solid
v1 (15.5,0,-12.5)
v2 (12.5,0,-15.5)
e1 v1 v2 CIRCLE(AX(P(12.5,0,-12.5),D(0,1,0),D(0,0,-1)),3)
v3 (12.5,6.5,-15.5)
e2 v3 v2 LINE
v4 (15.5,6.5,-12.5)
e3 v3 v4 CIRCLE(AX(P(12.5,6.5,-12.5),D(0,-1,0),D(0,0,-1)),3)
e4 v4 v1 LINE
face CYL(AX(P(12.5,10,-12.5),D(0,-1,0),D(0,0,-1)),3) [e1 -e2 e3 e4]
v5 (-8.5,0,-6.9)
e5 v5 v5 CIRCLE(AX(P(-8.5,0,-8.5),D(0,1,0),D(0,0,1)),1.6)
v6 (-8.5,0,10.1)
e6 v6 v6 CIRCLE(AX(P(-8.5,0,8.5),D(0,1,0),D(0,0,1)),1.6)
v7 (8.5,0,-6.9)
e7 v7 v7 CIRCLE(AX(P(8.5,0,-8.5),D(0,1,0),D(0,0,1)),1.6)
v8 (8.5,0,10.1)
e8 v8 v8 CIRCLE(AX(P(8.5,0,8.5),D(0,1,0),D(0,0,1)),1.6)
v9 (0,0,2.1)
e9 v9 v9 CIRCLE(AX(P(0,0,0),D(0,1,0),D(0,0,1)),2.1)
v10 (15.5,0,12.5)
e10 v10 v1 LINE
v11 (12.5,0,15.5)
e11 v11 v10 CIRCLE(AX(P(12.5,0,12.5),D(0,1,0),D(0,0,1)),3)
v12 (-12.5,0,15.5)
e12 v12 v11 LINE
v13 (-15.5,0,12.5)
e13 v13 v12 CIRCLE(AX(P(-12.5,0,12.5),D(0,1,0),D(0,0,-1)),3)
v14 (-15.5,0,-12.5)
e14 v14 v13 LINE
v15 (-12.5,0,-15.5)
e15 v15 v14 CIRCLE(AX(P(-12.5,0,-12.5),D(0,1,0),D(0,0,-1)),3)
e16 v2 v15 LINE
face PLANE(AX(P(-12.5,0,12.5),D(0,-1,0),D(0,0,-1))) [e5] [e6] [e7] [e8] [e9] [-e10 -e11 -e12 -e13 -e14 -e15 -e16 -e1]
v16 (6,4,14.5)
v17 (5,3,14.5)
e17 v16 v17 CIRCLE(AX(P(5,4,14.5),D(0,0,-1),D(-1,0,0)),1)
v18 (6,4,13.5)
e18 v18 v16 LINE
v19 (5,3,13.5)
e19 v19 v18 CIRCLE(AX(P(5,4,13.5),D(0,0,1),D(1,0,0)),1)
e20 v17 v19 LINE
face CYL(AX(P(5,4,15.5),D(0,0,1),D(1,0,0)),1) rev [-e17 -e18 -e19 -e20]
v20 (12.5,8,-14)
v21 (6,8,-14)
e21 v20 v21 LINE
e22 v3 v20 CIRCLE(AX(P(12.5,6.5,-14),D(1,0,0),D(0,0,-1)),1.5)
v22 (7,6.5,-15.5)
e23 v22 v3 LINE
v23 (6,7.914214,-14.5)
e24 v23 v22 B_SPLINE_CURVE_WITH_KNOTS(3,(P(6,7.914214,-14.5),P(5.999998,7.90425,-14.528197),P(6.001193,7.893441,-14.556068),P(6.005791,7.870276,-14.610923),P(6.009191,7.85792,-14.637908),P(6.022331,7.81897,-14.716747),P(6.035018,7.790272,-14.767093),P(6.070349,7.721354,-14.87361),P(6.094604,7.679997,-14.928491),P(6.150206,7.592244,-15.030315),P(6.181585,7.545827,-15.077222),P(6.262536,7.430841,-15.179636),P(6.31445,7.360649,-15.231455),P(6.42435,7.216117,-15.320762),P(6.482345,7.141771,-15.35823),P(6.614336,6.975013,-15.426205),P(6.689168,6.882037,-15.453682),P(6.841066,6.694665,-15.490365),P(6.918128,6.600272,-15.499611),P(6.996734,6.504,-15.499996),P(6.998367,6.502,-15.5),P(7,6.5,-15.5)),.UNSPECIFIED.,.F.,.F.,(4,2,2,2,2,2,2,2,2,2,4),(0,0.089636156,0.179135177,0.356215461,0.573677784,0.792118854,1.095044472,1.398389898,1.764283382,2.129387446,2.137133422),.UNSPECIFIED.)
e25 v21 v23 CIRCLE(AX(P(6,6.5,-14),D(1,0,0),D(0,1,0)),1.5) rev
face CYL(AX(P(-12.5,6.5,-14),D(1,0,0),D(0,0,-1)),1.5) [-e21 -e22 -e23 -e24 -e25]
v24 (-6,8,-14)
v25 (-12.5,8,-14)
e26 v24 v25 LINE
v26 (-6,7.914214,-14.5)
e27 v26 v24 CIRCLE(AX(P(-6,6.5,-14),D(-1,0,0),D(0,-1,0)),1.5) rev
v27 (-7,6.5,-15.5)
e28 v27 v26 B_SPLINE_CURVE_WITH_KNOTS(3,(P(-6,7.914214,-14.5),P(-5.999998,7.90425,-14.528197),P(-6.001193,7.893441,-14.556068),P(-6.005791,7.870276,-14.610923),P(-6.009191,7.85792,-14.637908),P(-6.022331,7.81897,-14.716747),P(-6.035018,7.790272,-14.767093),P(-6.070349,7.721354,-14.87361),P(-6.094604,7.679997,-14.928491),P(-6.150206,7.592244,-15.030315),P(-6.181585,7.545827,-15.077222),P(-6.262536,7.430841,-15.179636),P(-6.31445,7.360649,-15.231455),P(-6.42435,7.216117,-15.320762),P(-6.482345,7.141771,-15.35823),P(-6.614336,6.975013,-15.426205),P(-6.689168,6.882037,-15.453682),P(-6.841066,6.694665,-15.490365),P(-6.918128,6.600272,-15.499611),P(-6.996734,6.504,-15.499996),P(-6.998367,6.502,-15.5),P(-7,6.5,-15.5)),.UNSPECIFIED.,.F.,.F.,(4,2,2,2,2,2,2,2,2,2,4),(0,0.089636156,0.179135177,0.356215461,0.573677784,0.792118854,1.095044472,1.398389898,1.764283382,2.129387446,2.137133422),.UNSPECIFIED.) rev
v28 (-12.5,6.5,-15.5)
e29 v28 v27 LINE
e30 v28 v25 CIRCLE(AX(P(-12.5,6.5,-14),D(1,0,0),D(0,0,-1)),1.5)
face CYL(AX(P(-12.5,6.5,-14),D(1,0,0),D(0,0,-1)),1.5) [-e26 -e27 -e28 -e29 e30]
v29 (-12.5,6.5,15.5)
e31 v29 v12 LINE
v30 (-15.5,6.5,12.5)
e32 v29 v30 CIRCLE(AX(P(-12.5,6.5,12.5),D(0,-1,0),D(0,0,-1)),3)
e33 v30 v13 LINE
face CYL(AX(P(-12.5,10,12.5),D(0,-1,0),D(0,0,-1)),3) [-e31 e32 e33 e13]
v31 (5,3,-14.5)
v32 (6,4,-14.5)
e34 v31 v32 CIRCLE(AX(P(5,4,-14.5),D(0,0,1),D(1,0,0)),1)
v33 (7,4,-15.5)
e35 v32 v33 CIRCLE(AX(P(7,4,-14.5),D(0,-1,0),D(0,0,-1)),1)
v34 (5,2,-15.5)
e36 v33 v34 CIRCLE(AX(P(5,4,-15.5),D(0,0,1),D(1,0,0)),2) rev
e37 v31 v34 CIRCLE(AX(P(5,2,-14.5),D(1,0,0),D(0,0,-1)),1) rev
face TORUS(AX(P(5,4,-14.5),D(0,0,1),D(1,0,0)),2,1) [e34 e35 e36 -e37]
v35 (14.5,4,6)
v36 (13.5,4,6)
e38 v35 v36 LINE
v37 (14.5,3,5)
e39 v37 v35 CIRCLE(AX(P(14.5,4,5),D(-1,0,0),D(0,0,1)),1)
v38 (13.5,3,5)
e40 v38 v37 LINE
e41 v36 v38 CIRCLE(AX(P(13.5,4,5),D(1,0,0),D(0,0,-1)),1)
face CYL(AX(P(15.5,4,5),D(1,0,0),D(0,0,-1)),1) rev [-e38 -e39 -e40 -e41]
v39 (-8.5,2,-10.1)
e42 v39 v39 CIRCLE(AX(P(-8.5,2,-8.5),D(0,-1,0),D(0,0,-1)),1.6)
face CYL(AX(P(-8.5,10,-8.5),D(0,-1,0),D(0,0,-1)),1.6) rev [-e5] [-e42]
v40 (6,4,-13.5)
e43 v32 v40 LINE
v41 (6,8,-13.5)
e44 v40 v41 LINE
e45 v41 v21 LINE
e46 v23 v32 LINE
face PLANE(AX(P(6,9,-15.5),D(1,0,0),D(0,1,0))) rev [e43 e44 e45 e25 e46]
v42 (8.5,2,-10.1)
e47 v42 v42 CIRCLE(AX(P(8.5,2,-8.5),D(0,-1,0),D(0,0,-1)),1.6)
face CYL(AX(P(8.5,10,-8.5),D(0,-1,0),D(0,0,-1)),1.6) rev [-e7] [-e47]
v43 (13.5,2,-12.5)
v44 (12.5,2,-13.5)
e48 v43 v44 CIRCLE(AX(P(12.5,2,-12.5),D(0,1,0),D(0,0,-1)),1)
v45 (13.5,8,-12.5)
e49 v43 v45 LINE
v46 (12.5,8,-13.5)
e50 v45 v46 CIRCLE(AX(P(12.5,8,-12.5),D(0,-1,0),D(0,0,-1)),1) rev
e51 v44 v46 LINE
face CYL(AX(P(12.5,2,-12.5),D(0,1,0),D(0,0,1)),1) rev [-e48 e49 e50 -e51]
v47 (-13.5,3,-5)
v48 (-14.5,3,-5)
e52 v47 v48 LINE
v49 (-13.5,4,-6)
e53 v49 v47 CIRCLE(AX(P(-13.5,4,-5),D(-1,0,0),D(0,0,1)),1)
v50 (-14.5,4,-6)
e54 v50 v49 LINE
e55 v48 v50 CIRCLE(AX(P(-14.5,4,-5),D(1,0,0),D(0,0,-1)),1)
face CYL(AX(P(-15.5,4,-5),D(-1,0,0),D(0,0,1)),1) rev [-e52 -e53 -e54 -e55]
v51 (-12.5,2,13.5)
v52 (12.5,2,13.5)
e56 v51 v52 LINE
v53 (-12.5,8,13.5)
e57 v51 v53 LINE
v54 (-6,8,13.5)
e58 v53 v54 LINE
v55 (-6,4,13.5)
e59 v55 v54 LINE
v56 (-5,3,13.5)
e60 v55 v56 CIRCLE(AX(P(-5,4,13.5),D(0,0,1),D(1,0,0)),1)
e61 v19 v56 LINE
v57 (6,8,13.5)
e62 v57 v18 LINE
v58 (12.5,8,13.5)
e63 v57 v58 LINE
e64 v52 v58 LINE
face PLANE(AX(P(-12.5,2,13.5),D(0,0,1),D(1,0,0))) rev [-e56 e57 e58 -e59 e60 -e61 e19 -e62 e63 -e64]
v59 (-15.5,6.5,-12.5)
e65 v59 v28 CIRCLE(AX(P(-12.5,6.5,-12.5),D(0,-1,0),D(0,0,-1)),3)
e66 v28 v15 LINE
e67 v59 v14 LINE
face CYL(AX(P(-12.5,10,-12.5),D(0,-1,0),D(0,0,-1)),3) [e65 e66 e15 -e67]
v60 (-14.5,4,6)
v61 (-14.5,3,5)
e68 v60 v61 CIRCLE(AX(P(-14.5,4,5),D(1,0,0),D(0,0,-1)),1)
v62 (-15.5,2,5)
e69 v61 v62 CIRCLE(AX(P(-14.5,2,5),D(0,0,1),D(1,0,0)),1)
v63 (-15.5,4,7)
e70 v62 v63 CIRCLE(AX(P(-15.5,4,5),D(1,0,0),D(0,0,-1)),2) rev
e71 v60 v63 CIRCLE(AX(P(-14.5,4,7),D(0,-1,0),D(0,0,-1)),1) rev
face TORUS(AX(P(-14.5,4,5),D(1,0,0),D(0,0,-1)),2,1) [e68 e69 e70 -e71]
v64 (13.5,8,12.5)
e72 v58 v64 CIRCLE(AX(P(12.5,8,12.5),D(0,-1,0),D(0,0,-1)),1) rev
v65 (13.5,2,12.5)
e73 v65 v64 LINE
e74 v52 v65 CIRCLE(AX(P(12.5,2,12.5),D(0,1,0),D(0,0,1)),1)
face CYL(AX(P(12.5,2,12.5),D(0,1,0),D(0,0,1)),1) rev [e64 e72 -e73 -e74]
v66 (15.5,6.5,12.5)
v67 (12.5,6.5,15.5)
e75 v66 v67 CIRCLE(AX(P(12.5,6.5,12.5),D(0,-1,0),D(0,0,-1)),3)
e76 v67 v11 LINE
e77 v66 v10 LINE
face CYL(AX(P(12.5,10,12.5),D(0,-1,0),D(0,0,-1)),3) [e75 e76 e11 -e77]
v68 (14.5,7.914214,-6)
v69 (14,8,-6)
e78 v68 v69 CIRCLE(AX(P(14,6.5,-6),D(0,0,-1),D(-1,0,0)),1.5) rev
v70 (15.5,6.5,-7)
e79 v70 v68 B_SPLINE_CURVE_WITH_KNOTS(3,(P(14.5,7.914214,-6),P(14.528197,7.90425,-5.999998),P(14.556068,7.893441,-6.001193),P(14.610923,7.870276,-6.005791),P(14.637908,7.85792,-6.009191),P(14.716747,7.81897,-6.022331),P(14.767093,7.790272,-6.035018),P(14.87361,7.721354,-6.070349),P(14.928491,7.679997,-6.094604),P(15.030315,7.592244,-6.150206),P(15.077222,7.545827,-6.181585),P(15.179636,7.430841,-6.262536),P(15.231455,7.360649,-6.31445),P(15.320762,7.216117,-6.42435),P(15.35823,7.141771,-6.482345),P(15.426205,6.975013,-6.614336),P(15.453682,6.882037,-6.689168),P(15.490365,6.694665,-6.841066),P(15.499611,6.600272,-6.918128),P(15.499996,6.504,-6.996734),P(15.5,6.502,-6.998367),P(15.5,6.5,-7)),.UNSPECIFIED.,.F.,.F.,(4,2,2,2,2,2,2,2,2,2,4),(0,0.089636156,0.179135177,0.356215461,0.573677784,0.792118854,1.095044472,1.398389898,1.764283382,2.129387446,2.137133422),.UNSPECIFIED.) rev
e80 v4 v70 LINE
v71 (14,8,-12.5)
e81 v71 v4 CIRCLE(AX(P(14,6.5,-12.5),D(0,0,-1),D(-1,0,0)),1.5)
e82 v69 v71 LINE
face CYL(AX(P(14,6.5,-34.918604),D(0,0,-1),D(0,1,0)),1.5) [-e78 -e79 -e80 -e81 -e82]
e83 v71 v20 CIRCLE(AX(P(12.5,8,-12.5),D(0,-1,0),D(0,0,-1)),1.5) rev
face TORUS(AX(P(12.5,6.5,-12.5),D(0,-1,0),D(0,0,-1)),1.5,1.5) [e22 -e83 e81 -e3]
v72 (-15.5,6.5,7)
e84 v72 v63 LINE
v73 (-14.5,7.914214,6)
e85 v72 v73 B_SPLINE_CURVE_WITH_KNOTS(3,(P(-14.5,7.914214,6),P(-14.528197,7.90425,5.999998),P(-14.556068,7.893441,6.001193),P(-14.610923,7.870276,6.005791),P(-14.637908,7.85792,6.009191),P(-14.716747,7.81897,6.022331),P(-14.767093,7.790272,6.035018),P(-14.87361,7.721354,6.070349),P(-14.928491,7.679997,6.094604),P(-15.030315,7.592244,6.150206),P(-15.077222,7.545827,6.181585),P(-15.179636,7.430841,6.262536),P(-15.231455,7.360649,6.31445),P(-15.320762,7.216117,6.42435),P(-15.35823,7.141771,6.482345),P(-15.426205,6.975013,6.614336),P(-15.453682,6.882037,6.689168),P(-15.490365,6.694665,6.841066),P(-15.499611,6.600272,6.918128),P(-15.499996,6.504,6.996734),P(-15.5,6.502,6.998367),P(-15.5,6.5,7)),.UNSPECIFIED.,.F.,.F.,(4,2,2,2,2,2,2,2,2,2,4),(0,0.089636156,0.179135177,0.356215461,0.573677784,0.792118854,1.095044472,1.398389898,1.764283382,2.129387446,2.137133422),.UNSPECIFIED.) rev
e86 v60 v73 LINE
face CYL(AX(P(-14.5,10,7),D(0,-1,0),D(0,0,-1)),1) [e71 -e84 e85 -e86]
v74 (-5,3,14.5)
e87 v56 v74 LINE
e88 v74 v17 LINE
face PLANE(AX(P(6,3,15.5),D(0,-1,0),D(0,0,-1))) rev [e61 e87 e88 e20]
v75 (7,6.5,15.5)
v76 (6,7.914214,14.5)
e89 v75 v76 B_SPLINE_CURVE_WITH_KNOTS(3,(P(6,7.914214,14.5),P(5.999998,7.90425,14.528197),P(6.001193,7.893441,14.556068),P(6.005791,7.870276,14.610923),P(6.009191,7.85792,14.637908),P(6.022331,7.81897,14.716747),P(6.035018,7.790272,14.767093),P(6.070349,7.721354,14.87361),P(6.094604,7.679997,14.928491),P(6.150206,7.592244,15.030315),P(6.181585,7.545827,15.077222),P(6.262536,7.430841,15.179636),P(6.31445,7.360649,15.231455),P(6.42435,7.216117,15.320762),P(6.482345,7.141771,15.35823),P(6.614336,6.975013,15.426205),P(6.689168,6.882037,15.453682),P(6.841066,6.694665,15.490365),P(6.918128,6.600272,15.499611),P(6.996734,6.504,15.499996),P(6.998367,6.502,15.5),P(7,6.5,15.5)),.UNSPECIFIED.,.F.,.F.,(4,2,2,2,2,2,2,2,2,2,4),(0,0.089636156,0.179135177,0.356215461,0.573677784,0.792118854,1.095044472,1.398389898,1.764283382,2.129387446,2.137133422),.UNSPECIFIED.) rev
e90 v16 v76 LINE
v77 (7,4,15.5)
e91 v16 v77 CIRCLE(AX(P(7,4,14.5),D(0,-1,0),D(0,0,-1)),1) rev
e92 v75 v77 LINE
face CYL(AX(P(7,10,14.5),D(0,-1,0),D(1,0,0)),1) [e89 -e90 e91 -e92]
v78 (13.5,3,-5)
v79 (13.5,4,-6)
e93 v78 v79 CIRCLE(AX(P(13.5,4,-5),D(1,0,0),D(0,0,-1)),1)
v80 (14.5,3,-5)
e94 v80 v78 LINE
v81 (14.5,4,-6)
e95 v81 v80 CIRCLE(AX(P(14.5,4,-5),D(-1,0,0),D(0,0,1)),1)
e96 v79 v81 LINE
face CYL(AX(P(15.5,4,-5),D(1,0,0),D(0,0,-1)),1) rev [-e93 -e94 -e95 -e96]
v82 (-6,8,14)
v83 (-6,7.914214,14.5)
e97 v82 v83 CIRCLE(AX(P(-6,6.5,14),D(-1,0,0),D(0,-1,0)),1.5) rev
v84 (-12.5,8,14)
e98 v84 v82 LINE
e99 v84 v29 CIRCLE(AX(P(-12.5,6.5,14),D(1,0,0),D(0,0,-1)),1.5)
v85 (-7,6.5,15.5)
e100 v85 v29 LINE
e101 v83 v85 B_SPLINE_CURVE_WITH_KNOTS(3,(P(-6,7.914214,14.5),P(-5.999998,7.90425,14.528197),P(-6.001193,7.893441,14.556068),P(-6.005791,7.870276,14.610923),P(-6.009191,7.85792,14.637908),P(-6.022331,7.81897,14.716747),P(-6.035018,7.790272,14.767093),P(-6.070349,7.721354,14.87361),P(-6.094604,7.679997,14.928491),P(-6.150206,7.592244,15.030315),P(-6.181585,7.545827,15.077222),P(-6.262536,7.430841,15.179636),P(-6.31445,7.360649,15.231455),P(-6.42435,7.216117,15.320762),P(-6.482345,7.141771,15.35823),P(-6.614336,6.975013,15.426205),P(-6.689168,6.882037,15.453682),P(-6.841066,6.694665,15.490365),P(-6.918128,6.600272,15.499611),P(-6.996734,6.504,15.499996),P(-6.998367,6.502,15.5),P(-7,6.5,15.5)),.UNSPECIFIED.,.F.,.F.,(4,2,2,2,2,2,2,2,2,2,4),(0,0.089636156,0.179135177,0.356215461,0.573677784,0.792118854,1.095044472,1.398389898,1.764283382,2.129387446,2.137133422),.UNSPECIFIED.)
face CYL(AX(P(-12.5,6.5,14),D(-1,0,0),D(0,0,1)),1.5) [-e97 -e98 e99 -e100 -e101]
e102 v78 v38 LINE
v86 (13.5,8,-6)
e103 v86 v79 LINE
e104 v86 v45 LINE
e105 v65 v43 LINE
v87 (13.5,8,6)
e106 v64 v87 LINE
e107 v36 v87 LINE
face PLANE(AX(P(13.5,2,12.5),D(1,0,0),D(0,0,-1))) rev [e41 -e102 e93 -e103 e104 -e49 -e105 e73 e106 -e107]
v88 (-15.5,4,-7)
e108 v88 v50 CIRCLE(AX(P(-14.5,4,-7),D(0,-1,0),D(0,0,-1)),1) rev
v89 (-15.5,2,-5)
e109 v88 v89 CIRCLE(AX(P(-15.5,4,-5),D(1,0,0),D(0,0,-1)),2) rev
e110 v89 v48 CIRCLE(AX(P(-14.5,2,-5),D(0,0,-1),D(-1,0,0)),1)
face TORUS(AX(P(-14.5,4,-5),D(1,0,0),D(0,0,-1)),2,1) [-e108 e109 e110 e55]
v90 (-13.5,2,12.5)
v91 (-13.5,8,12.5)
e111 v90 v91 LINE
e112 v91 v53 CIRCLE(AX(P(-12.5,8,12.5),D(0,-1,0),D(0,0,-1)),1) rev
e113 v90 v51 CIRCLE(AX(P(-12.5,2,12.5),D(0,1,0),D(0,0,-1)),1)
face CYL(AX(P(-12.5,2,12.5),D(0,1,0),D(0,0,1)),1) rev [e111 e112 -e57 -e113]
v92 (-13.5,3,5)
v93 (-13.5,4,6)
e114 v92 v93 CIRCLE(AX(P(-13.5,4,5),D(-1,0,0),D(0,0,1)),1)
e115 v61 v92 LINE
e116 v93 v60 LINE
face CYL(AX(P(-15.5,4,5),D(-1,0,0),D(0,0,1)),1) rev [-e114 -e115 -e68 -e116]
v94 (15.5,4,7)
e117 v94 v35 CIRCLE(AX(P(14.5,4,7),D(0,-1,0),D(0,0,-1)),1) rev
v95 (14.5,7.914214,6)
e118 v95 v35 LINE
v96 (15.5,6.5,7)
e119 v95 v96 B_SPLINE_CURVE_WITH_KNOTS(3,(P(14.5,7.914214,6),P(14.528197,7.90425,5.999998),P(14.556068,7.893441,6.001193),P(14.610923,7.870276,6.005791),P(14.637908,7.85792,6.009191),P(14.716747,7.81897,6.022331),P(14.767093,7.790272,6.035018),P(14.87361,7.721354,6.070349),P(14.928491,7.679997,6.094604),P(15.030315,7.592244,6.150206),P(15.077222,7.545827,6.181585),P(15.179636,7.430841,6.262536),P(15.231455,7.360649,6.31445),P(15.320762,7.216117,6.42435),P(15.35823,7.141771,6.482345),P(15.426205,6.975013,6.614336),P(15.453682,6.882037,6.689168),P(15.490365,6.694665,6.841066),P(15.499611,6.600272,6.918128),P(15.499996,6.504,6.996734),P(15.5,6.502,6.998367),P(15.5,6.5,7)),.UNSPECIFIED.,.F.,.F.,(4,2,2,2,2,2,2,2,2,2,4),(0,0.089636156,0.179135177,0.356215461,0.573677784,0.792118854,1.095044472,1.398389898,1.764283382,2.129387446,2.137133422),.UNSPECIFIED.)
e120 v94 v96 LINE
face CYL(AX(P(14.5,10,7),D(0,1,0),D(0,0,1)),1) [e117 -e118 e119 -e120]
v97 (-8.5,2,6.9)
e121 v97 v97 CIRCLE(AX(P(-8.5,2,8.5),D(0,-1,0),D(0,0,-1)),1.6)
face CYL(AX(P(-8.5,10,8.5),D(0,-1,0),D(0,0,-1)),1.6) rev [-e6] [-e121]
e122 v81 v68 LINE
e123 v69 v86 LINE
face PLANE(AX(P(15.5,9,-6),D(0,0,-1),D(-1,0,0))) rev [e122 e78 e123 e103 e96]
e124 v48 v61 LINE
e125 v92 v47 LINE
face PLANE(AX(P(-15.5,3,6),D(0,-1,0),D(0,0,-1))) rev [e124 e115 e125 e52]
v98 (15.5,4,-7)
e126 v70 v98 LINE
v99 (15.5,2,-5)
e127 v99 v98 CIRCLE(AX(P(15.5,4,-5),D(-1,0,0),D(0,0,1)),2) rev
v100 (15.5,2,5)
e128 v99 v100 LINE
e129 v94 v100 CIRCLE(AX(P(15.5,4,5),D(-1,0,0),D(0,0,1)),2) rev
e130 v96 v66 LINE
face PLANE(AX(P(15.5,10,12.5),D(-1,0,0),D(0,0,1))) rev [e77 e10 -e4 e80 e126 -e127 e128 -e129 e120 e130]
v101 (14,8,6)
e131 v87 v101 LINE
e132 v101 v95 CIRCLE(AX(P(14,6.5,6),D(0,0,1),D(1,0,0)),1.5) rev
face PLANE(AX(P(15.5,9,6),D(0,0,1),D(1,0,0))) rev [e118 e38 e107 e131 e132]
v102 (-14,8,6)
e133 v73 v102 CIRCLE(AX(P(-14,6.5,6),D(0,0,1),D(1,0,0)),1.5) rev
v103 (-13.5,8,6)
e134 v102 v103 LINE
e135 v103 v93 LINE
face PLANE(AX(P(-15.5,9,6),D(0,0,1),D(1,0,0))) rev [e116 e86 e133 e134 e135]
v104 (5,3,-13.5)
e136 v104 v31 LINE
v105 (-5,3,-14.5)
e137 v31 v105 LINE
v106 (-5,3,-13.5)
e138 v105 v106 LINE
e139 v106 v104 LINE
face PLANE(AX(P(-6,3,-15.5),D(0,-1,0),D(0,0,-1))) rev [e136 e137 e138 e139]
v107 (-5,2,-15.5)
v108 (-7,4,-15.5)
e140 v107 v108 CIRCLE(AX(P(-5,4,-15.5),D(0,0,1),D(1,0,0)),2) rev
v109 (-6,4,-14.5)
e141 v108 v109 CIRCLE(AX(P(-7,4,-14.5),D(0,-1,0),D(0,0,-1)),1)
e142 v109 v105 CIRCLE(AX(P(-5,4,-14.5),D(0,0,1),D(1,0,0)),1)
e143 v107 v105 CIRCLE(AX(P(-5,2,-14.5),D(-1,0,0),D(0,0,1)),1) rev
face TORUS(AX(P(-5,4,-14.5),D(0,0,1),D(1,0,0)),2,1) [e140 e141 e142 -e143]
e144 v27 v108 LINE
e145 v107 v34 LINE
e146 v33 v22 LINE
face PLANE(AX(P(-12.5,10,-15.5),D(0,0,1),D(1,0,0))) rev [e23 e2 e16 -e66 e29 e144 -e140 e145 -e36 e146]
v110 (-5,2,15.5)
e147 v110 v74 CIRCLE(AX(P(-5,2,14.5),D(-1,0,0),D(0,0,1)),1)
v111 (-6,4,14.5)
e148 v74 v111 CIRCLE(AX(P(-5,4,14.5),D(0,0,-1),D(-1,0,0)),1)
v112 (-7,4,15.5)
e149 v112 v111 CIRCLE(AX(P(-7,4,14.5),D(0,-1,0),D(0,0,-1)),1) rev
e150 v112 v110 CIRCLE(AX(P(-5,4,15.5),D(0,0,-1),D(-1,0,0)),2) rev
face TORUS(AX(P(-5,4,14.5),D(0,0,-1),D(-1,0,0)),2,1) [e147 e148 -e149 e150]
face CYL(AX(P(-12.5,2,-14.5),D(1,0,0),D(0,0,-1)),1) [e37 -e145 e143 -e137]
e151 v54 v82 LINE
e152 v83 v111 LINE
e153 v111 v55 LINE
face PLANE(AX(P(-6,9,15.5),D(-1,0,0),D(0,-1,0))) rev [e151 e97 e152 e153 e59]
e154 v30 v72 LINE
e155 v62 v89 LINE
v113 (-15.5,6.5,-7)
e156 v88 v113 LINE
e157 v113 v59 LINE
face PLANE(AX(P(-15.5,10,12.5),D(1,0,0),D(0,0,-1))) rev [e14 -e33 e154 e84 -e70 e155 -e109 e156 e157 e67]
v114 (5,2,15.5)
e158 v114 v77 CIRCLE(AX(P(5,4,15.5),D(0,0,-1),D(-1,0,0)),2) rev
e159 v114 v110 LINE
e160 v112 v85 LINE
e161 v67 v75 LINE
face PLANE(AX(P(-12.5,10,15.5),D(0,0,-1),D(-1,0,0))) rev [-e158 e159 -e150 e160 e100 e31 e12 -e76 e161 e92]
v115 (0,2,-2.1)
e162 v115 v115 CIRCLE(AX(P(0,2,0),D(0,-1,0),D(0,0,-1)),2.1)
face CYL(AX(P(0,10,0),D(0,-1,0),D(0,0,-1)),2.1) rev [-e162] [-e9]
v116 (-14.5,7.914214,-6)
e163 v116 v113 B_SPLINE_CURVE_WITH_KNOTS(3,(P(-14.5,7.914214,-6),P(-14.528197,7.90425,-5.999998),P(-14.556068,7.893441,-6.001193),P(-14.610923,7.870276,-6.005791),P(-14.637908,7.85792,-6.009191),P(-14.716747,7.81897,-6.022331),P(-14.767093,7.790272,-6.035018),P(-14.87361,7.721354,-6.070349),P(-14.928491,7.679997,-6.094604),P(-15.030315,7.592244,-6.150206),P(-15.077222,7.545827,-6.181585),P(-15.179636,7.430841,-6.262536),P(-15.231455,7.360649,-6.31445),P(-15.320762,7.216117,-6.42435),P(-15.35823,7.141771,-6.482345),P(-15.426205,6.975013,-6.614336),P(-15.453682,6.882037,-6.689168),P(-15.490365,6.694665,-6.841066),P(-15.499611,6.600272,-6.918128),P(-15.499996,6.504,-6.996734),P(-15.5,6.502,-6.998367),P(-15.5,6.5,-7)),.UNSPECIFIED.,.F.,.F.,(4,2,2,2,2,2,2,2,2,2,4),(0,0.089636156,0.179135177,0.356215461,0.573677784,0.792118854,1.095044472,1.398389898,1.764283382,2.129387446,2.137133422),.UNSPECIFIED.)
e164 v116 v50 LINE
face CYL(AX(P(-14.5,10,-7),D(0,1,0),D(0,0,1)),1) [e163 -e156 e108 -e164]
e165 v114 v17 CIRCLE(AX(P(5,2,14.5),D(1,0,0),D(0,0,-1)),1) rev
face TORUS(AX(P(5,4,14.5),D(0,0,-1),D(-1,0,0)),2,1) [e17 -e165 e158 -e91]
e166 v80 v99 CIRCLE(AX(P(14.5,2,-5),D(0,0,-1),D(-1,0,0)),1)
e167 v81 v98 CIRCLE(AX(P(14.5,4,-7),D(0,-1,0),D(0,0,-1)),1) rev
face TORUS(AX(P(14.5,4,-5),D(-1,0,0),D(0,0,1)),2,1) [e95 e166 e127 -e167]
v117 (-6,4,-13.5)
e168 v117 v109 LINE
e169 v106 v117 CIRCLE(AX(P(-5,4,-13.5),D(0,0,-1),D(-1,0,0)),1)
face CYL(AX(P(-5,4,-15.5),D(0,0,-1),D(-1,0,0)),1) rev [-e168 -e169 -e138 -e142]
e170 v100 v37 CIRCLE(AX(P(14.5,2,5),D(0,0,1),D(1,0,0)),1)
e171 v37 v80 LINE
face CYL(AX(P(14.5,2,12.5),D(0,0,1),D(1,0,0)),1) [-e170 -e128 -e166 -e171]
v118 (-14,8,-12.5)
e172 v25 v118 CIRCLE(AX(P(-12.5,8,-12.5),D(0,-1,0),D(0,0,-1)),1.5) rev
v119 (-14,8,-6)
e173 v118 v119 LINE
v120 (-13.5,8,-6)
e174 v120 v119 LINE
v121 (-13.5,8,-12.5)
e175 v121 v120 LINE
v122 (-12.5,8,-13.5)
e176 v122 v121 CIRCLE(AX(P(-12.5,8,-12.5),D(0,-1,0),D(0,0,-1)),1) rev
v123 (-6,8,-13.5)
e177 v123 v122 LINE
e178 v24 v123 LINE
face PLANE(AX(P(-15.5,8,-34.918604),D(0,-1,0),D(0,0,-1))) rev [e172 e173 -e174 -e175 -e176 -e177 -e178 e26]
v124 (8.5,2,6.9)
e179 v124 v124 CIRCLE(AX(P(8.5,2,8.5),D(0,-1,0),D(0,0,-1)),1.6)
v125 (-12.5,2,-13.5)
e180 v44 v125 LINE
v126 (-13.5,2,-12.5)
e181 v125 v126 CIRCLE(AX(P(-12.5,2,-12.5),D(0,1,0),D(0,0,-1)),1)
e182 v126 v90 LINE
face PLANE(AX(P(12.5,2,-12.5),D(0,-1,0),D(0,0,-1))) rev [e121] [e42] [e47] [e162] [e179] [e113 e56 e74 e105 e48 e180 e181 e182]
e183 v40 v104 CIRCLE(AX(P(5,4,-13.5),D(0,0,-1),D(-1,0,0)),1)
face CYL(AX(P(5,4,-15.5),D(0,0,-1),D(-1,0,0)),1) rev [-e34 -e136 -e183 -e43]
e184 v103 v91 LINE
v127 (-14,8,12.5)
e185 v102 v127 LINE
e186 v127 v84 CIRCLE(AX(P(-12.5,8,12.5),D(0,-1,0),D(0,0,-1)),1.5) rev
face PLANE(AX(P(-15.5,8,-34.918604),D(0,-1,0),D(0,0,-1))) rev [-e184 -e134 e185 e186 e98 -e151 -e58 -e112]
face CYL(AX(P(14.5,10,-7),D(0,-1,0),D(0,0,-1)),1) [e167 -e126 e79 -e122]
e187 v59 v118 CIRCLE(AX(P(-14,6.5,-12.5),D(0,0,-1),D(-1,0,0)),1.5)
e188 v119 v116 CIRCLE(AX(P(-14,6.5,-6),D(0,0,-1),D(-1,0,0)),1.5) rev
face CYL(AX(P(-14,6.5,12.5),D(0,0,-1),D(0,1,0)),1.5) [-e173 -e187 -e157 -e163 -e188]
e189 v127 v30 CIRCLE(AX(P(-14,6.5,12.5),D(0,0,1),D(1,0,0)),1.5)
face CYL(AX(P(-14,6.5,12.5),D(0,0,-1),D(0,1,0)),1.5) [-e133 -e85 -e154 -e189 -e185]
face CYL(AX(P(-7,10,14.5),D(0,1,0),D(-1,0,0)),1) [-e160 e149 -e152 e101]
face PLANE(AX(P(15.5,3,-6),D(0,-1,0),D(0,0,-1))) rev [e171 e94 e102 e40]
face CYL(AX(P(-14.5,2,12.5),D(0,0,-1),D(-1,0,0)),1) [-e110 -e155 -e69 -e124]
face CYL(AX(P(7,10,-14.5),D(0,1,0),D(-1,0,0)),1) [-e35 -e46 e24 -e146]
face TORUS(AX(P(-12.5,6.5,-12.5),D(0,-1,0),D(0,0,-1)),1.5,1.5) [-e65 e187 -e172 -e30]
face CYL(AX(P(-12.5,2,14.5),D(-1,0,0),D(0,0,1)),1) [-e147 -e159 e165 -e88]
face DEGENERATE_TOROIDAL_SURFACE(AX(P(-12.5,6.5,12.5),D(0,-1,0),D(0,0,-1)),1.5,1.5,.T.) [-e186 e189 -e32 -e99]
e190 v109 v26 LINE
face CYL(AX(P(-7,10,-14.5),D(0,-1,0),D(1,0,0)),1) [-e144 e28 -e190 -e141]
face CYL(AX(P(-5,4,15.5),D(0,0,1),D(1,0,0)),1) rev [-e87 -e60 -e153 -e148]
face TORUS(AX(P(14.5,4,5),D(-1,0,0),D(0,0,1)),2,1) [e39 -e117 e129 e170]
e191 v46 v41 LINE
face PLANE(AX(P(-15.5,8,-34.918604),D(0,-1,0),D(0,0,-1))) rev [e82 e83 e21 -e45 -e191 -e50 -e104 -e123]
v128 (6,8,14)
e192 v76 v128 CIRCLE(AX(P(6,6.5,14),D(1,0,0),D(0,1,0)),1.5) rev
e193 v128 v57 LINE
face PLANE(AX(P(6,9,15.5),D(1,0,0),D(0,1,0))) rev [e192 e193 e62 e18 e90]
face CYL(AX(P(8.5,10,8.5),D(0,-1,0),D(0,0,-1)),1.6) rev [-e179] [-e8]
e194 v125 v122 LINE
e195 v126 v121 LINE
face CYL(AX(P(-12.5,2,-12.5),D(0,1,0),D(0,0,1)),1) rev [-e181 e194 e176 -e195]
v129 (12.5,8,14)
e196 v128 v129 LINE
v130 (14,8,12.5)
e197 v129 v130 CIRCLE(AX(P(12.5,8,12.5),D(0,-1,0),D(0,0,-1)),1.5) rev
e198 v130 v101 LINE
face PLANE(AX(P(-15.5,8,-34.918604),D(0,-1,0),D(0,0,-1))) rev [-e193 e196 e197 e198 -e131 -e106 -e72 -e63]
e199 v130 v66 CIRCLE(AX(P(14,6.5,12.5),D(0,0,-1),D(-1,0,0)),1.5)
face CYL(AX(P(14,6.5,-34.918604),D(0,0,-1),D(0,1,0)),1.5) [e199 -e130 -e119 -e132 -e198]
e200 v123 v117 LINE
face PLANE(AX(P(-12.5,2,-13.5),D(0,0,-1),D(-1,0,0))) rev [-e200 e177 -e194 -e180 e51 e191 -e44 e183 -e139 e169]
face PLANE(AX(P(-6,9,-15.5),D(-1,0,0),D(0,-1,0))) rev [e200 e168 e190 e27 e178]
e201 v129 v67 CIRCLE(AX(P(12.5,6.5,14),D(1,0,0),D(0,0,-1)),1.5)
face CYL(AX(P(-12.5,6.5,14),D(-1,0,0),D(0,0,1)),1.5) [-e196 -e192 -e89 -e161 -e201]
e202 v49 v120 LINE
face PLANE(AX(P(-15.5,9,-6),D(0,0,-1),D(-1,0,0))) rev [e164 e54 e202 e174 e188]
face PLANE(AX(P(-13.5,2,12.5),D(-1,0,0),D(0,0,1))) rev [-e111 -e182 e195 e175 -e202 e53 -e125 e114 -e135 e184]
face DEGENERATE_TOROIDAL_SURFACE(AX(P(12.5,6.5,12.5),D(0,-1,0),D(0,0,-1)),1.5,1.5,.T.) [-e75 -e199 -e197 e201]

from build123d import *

# Parameters (mm, degrees)
SKETCH1_R               = 2.1
SKETCH1_R_2             = 1.6
BOSS_EXTRUDE1_DEPTH     = 10
CUT_EXTRUDE1_DEPTH      = 8
SKETCH3_W               = 12
SKETCH3_H               = 6
CUT_EXTRUDE2_DEPTH      = 35.369317712
CIRPATTERN1_COUNT       = 4
FILLET1_R               = 1
CUT_EXTRUDE3_DEPTH      = 25.093567606
CUT_EXTRUDE3_DEPTH_BACK = 25.093567606
SKETCH4_W               = 64.927368138
SKETCH4_H               = 2
FILLET2_R               = 1.5


# Some blends are built 0.0001 mm under size
with BuildPart() as part:
    # Sketch1 → Boss-Extrude1 (new body)
    with BuildSketch(Plane(origin=(0, 0, 0), x_dir=(1, 0, 0), z_dir=(0, 1, 0))):
        with BuildLine():
            Line((-12.5, -15.5), (12.5, -15.5))
            ThreePointArc((12.5, -15.5), (14.621320344, -14.621320344), (15.5, -12.5))
            Line((15.5, -12.5), (15.5, 12.5))
            ThreePointArc((15.5, 12.5), (14.621320344, 14.621320344), (12.5, 15.5))
            Line((12.5, 15.5), (-12.5, 15.5))
            ThreePointArc((-12.5, 15.5), (-14.621320344, 14.621320344), (-15.5, 12.5))
            Line((-15.5, 12.5), (-15.5, -12.5))
            ThreePointArc((-15.5, -12.5), (-14.621320344, -14.621320344), (-12.5, -15.5))
        make_face()
        with Locations(Location((0, 0, 0), (0, 0, 270))):
            Circle(SKETCH1_R, mode=Mode.SUBTRACT)
        with Locations(Location((-8.5, 8.5, 0), (0, 0, 270))):
            Circle(SKETCH1_R_2, mode=Mode.SUBTRACT)
        with Locations(Location((8.5, 8.5, 0), (0, 0, 270))):
            Circle(SKETCH1_R_2, mode=Mode.SUBTRACT)
        with Locations(Location((8.5, -8.5, 0), (0, 0, 270))):
            Circle(SKETCH1_R_2, mode=Mode.SUBTRACT)
        with Locations(Location((-8.5, -8.5, 0), (0, 0, 270))):
            Circle(SKETCH1_R_2, mode=Mode.SUBTRACT)
    extrude(amount=BOSS_EXTRUDE1_DEPTH)

    # Sketch2 → Cut-Extrude1 (cut)
    with BuildSketch(Plane(origin=(0, 10, 0), x_dir=(1, 0, 0), z_dir=(0, 1, 0))):
        with BuildLine():
            Line((-12.5, -13.5), (12.5, -13.5))
            ThreePointArc((12.5, -13.5), (13.207106781, -13.207106781), (13.5, -12.5))
            Line((13.5, -12.5), (13.5, 12.5))
            ThreePointArc((13.5, 12.5), (13.207106781, 13.207106781), (12.5, 13.5))
            Line((12.5, 13.5), (-12.5, 13.5))
            ThreePointArc((-12.5, 13.5), (-13.207106781, 13.207106781), (-13.5, 12.5))
            Line((-13.5, 12.5), (-13.5, -12.5))
            ThreePointArc((-13.5, -12.5), (-13.207106781, -13.207106781), (-12.5, -13.5))
        make_face()
    extrude(amount=-CUT_EXTRUDE1_DEPTH, mode=Mode.SUBTRACT)

    # Sketch3 → Cut-Extrude2 (cut, through all)
    with BuildSketch(Plane.XY.offset(-13.5)):
        with Locations((0, 6)):
            Rectangle(SKETCH3_W, SKETCH3_H)
    cut_extrude2 = extrude(amount=-CUT_EXTRUDE2_DEPTH, mode=Mode.SUBTRACT)

    # CirPattern1: Cut-Extrude2 ×4 about axis
    cirpattern1_axis = Axis((0, 0, 0), (0, 1, 0))
    for i in range(1, CIRPATTERN1_COUNT):
        add(cut_extrude2.rotate(cirpattern1_axis, i * 360 / CIRPATTERN1_COUNT), mode=Mode.SUBTRACT)

    # Fillet1
    fillet1_edges = [part.edges().sort_by_distance(p)[0] for p in [
        (-15.5, 6, 6),
        (-14.5, 3, 6),
        (-15.5, 9, 0),
        (-14.5, 9, 6),
        (-15.5, 6, -6),
        (-14.5, 9, -6),
        (-15.5, 3, 0),
        (-14.5, 3, -6),
        (6, 6, 15.5),
        (6, 3, 14.5),
        (0, 9, 15.5),
        (6, 9, 14.5),
        (-6, 6, 15.5),
        (-6, 9, 14.5),
        (0, 3, 15.5),
        (-6, 3, 14.5),
        (15.5, 6, -6),
        (14.5, 3, -6),
        (15.5, 9, 0),
        (14.5, 9, -6),
        (15.5, 6, 6),
        (14.5, 9, 6),
        (15.5, 3, 0),
        (14.5, 3, 6),
        (-6, 6, -15.5),
        (-6, 3, -14.5),
        (0, 9, -15.5),
        (-6, 9, -14.5),
        (6, 6, -15.5),
        (6, 9, -14.5),
        (0, 3, -15.5),
        (6, 3, -14.5),
    ]]
    fillet(fillet1_edges, radius=FILLET1_R - 0.0001)  # a hair under: the kernel refuses the full size

    # Sketch4 → Cut-Extrude3 (cut, two sides: drawn at the far end of the back side and taken through both)
    with BuildSketch(Plane(origin=(0, 0, 0), x_dir=(0, 0, -1), z_dir=(1, 0, 0)).offset(-CUT_EXTRUDE3_DEPTH_BACK)):
        with Locations((2.454919732, 9)):
            Rectangle(SKETCH4_W, SKETCH4_H)
    extrude(amount=CUT_EXTRUDE3_DEPTH + CUT_EXTRUDE3_DEPTH_BACK, mode=Mode.SUBTRACT)

    # Fillet2
    # the kernel refuses this fillet: 1.5 mm, written as the material it takes off along each edge
    with BuildSketch(Plane(origin=(12.5, 8, -12.5), x_dir=(0, 0, -1), z_dir=(-1, 0, 0))) as fillet2_piece_1:
        with BuildLine():
            CenterArc((3 - FILLET2_R, FILLET2_R), FILLET2_R, 270, 90)
            Line((3 - FILLET2_R, 0), (3, 0))
            Line((3, 0), (3, FILLET2_R))
        make_face()
    revolve(axis=Axis((12.5, 8, -12.5), (0, -1, 0)), revolution_arc=90, mode=Mode.SUBTRACT)
    with BuildSketch(Plane(origin=(3.2499, 8, -15.5), x_dir=(0, -1, 0), z_dir=(1, 0, 0)), Plane(origin=(15.5, 8, -12.5), x_dir=(0, -1, 0), z_dir=(0, 0, 1)), Plane(origin=(15.5, 8, 3.2499), x_dir=(0, -1, 0), z_dir=(0, 0, 1)), Plane(origin=(12.5, 8, 15.5), x_dir=(0, -1, 0), z_dir=(-1, 0, 0)), Plane(origin=(-15.5, 8, 12.5), x_dir=(0, -1, 0), z_dir=(0, 0, -1)), Plane(origin=(-15.5, 8, -3.2499), x_dir=(0, -1, 0), z_dir=(0, 0, -1))) as fillet2_piece_2:
        with BuildLine():
            CenterArc((FILLET2_R, -FILLET2_R), FILLET2_R, 90, 90)
            Line((0, -FILLET2_R), (0, 0))
            Line((0, 0), (FILLET2_R, 0))
        make_face()
    extrude(amount=9.2501, mode=Mode.SUBTRACT)
    with BuildSketch(Plane(origin=(12.5, 8, 12.5), x_dir=(1, 0, 0), z_dir=(0, 0, -1))) as fillet2_piece_3:
        with BuildLine():
            CenterArc((3 - FILLET2_R, FILLET2_R), FILLET2_R, 270, 90)
            Line((3 - FILLET2_R, 0), (3, 0))
            Line((3, 0), (3, FILLET2_R))
        make_face()
    revolve(axis=Axis((12.5, 8, 12.5), (0, -1, 0)), revolution_arc=90, mode=Mode.SUBTRACT)
    with BuildSketch(Plane(origin=(-3.2499, 8, 15.5), x_dir=(0, 0, -1), z_dir=(-1, 0, 0)), Plane(origin=(-12.5, 8, -15.5), x_dir=(0, 0, 1), z_dir=(1, 0, 0))) as fillet2_piece_4:
        with BuildLine():
            CenterArc((FILLET2_R, FILLET2_R), FILLET2_R, 180, 90)
            Line((0, FILLET2_R), (0, 0))
            Line((0, 0), (FILLET2_R, 0))
        make_face()
    extrude(amount=9.2501, mode=Mode.SUBTRACT)
    with BuildSketch(Plane(origin=(-12.5, 8, 12.5), x_dir=(0, 0, 1), z_dir=(1, 0, 0))) as fillet2_piece_5:
        with BuildLine():
            CenterArc((3 - FILLET2_R, FILLET2_R), FILLET2_R, 270, 90)
            Line((3 - FILLET2_R, 0), (3, 0))
            Line((3, 0), (3, FILLET2_R))
        make_face()
    revolve(axis=Axis((-12.5, 8, 12.5), (0, -1, 0)), revolution_arc=90, mode=Mode.SUBTRACT)
    with BuildSketch(Plane(origin=(-12.5, 8, -12.5), x_dir=(-1, 0, 0), z_dir=(0, 0, 1))) as fillet2_piece_6:
        with BuildLine():
            CenterArc((3 - FILLET2_R, FILLET2_R), FILLET2_R, 270, 90)
            Line((3, FILLET2_R), (3, 0))
            Line((3, 0), (3 - FILLET2_R, 0))
        make_face()
    revolve(axis=Axis((-12.5, 8, -12.5), (0, -1, 0)), revolution_arc=90, mode=Mode.SUBTRACT)


solid = part.part
